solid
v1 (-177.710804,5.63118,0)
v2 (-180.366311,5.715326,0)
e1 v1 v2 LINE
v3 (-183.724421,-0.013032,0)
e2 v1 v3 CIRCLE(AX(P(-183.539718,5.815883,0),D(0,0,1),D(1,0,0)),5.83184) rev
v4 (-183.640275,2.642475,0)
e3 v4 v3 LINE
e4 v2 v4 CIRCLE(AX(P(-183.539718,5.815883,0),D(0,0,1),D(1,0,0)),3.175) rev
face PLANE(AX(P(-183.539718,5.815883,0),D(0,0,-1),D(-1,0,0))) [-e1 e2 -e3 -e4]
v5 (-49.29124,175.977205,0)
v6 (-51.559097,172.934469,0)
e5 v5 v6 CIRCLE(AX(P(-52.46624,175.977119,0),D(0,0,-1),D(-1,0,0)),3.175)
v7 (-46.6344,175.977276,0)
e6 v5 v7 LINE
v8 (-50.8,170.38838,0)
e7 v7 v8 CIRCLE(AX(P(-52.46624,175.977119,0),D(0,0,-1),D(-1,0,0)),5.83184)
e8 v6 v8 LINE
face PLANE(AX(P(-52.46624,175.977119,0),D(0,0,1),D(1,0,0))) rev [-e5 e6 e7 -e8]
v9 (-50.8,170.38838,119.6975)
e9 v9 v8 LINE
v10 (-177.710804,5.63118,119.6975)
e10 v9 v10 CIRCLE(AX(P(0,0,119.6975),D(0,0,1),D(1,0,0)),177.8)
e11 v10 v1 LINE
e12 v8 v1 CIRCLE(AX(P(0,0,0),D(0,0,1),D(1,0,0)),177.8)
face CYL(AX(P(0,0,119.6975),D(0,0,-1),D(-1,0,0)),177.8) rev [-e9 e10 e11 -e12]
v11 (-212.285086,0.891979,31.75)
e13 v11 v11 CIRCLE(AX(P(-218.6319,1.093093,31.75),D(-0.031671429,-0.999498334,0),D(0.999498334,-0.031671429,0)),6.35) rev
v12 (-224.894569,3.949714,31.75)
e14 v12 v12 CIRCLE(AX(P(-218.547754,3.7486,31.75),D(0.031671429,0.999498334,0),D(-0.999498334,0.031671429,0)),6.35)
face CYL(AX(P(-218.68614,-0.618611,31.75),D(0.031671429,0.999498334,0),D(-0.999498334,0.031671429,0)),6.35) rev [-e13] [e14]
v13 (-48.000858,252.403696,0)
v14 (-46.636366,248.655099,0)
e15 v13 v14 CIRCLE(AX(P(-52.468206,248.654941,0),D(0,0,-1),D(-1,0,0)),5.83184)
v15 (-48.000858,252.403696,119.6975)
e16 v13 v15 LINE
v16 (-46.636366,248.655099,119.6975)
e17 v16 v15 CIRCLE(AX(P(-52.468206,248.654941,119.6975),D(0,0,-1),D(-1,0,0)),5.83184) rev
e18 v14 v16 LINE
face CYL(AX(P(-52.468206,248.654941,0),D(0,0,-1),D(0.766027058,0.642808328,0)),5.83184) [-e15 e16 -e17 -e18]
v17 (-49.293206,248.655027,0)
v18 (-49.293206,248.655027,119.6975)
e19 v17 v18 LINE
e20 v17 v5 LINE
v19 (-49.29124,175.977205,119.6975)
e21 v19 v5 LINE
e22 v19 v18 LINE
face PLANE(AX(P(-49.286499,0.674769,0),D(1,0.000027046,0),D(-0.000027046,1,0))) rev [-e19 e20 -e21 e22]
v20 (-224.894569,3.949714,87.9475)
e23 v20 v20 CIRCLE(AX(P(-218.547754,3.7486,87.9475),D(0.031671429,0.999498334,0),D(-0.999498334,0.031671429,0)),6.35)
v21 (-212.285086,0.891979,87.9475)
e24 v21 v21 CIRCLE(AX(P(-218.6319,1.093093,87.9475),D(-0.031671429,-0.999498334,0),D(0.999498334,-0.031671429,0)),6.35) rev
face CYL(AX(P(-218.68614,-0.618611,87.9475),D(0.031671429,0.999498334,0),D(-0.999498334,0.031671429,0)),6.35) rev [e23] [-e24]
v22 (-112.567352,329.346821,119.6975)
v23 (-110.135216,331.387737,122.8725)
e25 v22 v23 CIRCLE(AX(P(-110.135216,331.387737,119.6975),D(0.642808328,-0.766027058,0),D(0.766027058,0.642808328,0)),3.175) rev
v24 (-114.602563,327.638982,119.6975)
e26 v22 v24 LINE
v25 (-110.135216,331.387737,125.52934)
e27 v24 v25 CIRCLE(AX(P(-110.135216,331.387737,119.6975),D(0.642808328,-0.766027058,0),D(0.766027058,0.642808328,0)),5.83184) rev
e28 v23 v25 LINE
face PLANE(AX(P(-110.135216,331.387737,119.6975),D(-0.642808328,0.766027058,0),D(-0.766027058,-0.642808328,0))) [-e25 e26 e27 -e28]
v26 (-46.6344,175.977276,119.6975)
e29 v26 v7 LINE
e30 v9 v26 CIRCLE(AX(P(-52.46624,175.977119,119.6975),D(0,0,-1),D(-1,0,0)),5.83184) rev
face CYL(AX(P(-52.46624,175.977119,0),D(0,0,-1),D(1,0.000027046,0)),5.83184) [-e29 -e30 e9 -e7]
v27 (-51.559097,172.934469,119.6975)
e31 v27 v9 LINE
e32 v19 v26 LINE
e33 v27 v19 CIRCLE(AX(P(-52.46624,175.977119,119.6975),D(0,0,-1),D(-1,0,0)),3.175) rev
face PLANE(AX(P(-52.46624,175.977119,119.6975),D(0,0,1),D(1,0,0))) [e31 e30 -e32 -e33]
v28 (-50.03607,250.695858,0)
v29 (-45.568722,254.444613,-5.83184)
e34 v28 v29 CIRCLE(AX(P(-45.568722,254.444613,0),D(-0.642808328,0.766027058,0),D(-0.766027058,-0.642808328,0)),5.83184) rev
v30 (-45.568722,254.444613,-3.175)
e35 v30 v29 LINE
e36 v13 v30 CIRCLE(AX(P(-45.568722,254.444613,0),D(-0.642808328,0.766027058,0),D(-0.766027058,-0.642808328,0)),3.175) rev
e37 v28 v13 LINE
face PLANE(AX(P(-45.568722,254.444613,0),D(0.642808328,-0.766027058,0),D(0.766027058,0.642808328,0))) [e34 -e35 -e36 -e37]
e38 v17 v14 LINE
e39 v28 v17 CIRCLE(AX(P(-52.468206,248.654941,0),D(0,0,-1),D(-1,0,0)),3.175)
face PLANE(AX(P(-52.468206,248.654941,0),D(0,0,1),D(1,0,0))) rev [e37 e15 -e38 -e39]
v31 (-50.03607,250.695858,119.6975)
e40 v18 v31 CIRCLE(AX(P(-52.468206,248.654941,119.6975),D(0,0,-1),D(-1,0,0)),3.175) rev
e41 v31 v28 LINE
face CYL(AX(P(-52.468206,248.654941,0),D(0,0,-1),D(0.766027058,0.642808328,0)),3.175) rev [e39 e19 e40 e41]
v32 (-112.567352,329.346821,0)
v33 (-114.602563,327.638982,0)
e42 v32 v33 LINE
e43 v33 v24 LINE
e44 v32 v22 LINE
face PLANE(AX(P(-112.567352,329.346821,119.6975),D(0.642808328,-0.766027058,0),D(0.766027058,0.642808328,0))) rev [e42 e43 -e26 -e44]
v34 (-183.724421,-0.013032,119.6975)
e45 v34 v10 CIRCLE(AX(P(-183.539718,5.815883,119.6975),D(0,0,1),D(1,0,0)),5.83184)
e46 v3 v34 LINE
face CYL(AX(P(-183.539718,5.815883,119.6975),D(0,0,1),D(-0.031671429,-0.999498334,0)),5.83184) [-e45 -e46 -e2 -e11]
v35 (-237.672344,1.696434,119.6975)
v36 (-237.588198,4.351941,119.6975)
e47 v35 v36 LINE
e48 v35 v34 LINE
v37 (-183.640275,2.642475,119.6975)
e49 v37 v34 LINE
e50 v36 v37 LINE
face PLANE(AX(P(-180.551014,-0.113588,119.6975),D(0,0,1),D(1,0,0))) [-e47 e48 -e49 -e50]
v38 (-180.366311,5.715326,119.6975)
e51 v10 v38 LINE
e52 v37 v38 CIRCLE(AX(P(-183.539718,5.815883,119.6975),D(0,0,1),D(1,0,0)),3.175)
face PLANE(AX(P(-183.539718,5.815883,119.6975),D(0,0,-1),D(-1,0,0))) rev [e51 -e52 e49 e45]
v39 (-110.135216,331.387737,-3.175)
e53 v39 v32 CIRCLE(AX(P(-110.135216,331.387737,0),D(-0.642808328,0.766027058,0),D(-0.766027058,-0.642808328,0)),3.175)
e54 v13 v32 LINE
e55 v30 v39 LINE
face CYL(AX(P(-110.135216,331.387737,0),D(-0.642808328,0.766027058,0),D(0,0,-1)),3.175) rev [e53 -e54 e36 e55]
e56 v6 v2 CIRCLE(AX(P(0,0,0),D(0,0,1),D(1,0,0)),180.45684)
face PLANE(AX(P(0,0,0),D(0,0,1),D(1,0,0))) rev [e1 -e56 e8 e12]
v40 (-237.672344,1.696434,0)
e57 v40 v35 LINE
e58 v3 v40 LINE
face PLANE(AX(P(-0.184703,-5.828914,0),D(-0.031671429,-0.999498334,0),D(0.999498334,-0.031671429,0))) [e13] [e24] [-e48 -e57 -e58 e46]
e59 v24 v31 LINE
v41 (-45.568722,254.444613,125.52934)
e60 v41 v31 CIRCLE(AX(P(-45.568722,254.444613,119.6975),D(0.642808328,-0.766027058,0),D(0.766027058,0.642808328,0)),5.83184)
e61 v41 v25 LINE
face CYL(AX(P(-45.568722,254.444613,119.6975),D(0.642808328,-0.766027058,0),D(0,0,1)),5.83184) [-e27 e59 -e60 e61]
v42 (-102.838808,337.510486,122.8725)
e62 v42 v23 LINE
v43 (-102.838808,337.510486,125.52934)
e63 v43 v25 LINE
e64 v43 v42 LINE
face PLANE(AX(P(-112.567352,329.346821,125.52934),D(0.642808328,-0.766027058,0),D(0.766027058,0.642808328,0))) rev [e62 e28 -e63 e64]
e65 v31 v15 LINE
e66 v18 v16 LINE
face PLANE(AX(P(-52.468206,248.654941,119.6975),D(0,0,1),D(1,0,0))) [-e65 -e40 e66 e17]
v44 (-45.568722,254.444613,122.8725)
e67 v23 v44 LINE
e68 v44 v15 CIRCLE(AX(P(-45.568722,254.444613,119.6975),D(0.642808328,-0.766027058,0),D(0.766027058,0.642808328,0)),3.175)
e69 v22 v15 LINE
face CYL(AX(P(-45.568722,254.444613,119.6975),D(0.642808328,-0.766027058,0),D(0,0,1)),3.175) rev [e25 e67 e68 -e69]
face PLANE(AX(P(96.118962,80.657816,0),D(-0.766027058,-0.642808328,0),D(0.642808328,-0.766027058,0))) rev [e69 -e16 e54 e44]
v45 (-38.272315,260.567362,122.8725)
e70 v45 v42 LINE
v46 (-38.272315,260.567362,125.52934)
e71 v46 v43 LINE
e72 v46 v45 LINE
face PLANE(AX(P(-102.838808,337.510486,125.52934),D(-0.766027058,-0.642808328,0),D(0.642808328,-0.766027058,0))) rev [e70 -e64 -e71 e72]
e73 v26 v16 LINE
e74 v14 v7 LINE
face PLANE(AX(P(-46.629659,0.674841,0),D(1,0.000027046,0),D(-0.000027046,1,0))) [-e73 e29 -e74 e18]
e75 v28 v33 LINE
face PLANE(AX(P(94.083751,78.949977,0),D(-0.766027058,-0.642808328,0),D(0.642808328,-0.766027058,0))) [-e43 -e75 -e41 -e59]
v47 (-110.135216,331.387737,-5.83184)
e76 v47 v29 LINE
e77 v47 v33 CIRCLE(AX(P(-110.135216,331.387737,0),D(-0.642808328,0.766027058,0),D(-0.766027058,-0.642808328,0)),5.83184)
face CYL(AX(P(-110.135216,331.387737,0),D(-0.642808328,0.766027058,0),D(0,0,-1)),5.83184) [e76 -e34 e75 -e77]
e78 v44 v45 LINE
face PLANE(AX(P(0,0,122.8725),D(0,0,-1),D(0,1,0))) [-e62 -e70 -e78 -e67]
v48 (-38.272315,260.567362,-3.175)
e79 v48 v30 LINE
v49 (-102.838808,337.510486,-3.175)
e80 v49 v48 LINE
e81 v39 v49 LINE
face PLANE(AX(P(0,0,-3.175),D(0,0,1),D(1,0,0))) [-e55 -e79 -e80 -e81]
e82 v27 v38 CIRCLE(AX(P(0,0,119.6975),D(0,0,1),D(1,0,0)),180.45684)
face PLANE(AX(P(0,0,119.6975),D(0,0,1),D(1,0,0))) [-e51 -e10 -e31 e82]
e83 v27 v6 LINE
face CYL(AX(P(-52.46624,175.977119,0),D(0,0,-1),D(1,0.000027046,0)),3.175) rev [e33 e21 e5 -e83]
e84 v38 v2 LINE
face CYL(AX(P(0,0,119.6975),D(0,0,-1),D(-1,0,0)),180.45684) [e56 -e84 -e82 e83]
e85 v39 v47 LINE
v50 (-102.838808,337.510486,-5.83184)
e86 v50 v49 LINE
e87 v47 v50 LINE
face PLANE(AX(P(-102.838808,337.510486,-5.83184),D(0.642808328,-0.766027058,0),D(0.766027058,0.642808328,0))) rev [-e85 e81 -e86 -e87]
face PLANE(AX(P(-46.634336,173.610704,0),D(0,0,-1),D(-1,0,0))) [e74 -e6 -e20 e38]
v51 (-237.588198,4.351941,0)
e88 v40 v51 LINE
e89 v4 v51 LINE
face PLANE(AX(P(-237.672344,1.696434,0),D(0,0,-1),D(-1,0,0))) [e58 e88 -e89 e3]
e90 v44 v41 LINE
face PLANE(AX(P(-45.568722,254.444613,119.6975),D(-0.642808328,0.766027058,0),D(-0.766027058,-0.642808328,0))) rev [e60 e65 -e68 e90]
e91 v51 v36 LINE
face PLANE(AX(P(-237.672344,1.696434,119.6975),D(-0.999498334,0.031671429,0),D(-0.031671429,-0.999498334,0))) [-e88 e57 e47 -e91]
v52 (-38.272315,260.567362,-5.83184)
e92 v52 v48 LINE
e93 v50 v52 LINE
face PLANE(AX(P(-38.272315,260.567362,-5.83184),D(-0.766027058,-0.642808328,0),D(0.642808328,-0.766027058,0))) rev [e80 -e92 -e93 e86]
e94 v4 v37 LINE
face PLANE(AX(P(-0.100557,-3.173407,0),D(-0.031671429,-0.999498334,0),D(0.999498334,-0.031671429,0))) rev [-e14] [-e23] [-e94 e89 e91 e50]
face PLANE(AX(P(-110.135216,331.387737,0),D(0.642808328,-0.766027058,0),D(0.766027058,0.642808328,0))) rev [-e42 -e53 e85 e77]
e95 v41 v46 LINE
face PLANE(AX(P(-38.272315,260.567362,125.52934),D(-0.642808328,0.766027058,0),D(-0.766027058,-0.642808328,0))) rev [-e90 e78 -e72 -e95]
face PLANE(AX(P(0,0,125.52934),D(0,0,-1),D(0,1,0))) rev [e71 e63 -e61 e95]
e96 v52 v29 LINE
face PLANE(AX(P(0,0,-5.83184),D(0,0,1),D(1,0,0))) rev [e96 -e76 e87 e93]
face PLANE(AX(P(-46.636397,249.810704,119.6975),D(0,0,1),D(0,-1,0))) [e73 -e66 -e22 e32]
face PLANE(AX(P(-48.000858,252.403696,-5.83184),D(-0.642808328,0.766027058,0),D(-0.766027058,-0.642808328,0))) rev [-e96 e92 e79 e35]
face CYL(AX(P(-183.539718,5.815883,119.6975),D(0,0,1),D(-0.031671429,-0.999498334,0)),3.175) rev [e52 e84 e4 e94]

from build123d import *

# Parameters (mm, degrees)
BASE_FLANGE1_DEPTH           = 119.6975
EDGE_FLANGE1_DEPTH           = 119.6975
EDGE_FLANGE2_STRIP_CUT_DEPTH = 119.6975
EDGE_FLANGE2_DEPTH           = 119.6975
EDGE_FLANGE3_DEPTH           = 119.6975
SKETCH20_R                   = 6.35
CUT_EXTRUDE1_DEPTH           = 2.65684
EDGE_FLANGE4_DEPTH           = 100.444394506
EDGE_FLANGE5_DEPTH           = 100.444394506


# Sheet-metal steps are written as plain solids
with BuildPart() as part:
    # Sketch1 → Base-Flange1 (new body)
    with BuildSketch(Plane.XY):
        with BuildLine():
            ThreePointArc((-50.8, 170.388379885), (-140.856418383, 108.500273734), (-177.710803869, 5.63118))
            Line((-177.710803869, 5.63118), (-180.366311024, 5.715325918))
            ThreePointArc((-180.366311024, 5.715325918), (-142.961215721, 110.121577824), (-51.559097143, 172.934469105))
            Line((-51.559097143, 172.934469105), (-50.8, 170.388379885))
        make_face()
    extrude(amount=BASE_FLANGE1_DEPTH)

    # Edge-Flange1 section (across the edge) → Edge-Flange1 (add)
    with BuildSketch(Plane(origin=(-49.291175996, 173.610632552, 119.6975), x_dir=(-0.9999999996342678, -2.7045604981568168e-05, 0), z_dir=(0, 0, -1))):
        with BuildLine():
            Line((-2.65684, 2.366572064), (-2.65684, 76.2))
            Line((-2.65684, 76.2), (0, 76.2))
            Line((0, 76.2), (0, 2.366572064))
            ThreePointArc((0, 2.366572064), (0.62936233, 0.469112223), (2.267939433, -0.676102109))
            Line((2.267939433, -0.676102109), (1.508911151, -3.222211858))
            ThreePointArc((1.508911151, -3.222211858), (-1.500827273, -1.118682173), (-2.65684, 2.366572064))
        make_face()
    extrude(amount=EDGE_FLANGE1_DEPTH)

    # Edge-Flange2 strip (across the edge) → Edge-Flange2 strip cut (cut)
    with BuildSketch(Plane(origin=(-49.293236871, 249.810632524, 119.6975), x_dir=(-0.7660270582590358, -0.6428083275868537, 0), z_dir=(0, 0, -1))):
        Polygon((-12.205285278, 10.412383287), (-1.292448625, -2.593029), (0.742808893, -0.885245167), (-10.17002776, 12.12016712), align=None)
    extrude(amount=EDGE_FLANGE2_STRIP_CUT_DEPTH, mode=Mode.SUBTRACT)

    # Edge-Flange2 section (across the edge) → Edge-Flange2 (add)
    with BuildSketch(Plane(origin=(-49.293236871, 249.810632524, 119.6975), x_dir=(-0.7660270582590358, -0.6428083275868537, 0), z_dir=(0, 0, -1))):
        with BuildLine():
            Line((-2.65684, 1.155605494), (-2.65684, 101.6))
            Line((-2.65684, 101.6), (0, 101.6))
            Line((0, 101.6), (0, 1.155605494))
            ThreePointArc((0, 1.155605494), (0.191475929, 0.069691539), (0.742808893, -0.885245167))
            Line((0.742808893, -0.885245167), (-1.292448625, -2.593029))
            ThreePointArc((-1.292448625, -2.593029), (-2.305137014, -0.839001259), (-2.65684, 1.155605494))
        make_face()
    extrude(amount=EDGE_FLANGE2_DEPTH)

    # Edge-Flange3 section (across the edge) → Edge-Flange3 (add)
    with BuildSketch(Plane(origin=(-180.46686781, 2.541918706, 0), x_dir=(0.0316714285714251, 0.9994983344719717, 0), z_dir=(0, 0, 1))):
        with BuildLine():
            Line((-2.65684, 3.175), (-2.65684, 57.15))
            Line((-2.65684, 57.15), (0, 57.15))
            Line((0, 57.15), (0, 3.175))
            ThreePointArc((0, 3.175), (0.92993597, 0.92993597), (3.175, 0))
            Line((3.175, 0), (3.175, -2.65684))
            ThreePointArc((3.175, -2.65684), (-0.948733611, -0.948733611), (-2.65684, 3.175))
        make_face()
    extrude(amount=EDGE_FLANGE3_DEPTH)

    # Sketch20 → Cut-Extrude1 (cut)
    with BuildSketch(Plane(origin=(-0.100556786, -3.173407212, 0), x_dir=(0.9994983344719716, -0.03167142857142512, 0), z_dir=(0.03167142857142512, 0.9994983344719717, 0))):
        with Locations(Location((-218.55684, -31.75, 0), (0, 0, 180))):
            Circle(SKETCH20_R)
        with Locations(Location((-218.55684, -87.9475, 0), (0, 0, 180))):
            Circle(SKETCH20_R)
    extrude(amount=-CUT_EXTRUDE1_DEPTH, mode=Mode.SUBTRACT)

    # Edge-Flange4 section (across the edge) → Edge-Flange4 (add)
    with BuildSketch(Plane(origin=(-112.567351624, 329.34682052, 122.8725), x_dir=(0, 0, -1), z_dir=(0.6428083275868537, -0.7660270582590358, 0))):
        with BuildLine():
            Line((-2.65684, 3.175), (-2.65684, 12.7))
            Line((-2.65684, 12.7), (0, 12.7))
            Line((0, 12.7), (0, 3.175))
            ThreePointArc((0, 3.175), (0.92993597, 0.92993597), (3.175, 0))
            Line((3.175, 0), (3.175, -2.65684))
            ThreePointArc((3.175, -2.65684), (-0.948733611, -0.948733611), (-2.65684, 3.175))
        make_face()
    extrude(amount=EDGE_FLANGE4_DEPTH)

    # Edge-Flange5 section (across the edge) → Edge-Flange5 (add)
    with BuildSketch(Plane(origin=(-48.000858376, 252.403696478, -3.175), x_dir=(0, 0, 1), z_dir=(-0.642808327586854, 0.7660270582590356, 0))):
        with BuildLine():
            Line((-2.65684, 3.175), (-2.65684, 12.7))
            Line((-2.65684, 12.7), (0, 12.7))
            Line((0, 12.7), (0, 3.175))
            ThreePointArc((0, 3.175), (0.92993597, 0.92993597), (3.175, 0))
            Line((3.175, 0), (3.175, -2.65684))
            ThreePointArc((3.175, -2.65684), (-0.948733611, -0.948733611), (-2.65684, 3.175))
        make_face()
    extrude(amount=EDGE_FLANGE5_DEPTH)


solid = part.part
